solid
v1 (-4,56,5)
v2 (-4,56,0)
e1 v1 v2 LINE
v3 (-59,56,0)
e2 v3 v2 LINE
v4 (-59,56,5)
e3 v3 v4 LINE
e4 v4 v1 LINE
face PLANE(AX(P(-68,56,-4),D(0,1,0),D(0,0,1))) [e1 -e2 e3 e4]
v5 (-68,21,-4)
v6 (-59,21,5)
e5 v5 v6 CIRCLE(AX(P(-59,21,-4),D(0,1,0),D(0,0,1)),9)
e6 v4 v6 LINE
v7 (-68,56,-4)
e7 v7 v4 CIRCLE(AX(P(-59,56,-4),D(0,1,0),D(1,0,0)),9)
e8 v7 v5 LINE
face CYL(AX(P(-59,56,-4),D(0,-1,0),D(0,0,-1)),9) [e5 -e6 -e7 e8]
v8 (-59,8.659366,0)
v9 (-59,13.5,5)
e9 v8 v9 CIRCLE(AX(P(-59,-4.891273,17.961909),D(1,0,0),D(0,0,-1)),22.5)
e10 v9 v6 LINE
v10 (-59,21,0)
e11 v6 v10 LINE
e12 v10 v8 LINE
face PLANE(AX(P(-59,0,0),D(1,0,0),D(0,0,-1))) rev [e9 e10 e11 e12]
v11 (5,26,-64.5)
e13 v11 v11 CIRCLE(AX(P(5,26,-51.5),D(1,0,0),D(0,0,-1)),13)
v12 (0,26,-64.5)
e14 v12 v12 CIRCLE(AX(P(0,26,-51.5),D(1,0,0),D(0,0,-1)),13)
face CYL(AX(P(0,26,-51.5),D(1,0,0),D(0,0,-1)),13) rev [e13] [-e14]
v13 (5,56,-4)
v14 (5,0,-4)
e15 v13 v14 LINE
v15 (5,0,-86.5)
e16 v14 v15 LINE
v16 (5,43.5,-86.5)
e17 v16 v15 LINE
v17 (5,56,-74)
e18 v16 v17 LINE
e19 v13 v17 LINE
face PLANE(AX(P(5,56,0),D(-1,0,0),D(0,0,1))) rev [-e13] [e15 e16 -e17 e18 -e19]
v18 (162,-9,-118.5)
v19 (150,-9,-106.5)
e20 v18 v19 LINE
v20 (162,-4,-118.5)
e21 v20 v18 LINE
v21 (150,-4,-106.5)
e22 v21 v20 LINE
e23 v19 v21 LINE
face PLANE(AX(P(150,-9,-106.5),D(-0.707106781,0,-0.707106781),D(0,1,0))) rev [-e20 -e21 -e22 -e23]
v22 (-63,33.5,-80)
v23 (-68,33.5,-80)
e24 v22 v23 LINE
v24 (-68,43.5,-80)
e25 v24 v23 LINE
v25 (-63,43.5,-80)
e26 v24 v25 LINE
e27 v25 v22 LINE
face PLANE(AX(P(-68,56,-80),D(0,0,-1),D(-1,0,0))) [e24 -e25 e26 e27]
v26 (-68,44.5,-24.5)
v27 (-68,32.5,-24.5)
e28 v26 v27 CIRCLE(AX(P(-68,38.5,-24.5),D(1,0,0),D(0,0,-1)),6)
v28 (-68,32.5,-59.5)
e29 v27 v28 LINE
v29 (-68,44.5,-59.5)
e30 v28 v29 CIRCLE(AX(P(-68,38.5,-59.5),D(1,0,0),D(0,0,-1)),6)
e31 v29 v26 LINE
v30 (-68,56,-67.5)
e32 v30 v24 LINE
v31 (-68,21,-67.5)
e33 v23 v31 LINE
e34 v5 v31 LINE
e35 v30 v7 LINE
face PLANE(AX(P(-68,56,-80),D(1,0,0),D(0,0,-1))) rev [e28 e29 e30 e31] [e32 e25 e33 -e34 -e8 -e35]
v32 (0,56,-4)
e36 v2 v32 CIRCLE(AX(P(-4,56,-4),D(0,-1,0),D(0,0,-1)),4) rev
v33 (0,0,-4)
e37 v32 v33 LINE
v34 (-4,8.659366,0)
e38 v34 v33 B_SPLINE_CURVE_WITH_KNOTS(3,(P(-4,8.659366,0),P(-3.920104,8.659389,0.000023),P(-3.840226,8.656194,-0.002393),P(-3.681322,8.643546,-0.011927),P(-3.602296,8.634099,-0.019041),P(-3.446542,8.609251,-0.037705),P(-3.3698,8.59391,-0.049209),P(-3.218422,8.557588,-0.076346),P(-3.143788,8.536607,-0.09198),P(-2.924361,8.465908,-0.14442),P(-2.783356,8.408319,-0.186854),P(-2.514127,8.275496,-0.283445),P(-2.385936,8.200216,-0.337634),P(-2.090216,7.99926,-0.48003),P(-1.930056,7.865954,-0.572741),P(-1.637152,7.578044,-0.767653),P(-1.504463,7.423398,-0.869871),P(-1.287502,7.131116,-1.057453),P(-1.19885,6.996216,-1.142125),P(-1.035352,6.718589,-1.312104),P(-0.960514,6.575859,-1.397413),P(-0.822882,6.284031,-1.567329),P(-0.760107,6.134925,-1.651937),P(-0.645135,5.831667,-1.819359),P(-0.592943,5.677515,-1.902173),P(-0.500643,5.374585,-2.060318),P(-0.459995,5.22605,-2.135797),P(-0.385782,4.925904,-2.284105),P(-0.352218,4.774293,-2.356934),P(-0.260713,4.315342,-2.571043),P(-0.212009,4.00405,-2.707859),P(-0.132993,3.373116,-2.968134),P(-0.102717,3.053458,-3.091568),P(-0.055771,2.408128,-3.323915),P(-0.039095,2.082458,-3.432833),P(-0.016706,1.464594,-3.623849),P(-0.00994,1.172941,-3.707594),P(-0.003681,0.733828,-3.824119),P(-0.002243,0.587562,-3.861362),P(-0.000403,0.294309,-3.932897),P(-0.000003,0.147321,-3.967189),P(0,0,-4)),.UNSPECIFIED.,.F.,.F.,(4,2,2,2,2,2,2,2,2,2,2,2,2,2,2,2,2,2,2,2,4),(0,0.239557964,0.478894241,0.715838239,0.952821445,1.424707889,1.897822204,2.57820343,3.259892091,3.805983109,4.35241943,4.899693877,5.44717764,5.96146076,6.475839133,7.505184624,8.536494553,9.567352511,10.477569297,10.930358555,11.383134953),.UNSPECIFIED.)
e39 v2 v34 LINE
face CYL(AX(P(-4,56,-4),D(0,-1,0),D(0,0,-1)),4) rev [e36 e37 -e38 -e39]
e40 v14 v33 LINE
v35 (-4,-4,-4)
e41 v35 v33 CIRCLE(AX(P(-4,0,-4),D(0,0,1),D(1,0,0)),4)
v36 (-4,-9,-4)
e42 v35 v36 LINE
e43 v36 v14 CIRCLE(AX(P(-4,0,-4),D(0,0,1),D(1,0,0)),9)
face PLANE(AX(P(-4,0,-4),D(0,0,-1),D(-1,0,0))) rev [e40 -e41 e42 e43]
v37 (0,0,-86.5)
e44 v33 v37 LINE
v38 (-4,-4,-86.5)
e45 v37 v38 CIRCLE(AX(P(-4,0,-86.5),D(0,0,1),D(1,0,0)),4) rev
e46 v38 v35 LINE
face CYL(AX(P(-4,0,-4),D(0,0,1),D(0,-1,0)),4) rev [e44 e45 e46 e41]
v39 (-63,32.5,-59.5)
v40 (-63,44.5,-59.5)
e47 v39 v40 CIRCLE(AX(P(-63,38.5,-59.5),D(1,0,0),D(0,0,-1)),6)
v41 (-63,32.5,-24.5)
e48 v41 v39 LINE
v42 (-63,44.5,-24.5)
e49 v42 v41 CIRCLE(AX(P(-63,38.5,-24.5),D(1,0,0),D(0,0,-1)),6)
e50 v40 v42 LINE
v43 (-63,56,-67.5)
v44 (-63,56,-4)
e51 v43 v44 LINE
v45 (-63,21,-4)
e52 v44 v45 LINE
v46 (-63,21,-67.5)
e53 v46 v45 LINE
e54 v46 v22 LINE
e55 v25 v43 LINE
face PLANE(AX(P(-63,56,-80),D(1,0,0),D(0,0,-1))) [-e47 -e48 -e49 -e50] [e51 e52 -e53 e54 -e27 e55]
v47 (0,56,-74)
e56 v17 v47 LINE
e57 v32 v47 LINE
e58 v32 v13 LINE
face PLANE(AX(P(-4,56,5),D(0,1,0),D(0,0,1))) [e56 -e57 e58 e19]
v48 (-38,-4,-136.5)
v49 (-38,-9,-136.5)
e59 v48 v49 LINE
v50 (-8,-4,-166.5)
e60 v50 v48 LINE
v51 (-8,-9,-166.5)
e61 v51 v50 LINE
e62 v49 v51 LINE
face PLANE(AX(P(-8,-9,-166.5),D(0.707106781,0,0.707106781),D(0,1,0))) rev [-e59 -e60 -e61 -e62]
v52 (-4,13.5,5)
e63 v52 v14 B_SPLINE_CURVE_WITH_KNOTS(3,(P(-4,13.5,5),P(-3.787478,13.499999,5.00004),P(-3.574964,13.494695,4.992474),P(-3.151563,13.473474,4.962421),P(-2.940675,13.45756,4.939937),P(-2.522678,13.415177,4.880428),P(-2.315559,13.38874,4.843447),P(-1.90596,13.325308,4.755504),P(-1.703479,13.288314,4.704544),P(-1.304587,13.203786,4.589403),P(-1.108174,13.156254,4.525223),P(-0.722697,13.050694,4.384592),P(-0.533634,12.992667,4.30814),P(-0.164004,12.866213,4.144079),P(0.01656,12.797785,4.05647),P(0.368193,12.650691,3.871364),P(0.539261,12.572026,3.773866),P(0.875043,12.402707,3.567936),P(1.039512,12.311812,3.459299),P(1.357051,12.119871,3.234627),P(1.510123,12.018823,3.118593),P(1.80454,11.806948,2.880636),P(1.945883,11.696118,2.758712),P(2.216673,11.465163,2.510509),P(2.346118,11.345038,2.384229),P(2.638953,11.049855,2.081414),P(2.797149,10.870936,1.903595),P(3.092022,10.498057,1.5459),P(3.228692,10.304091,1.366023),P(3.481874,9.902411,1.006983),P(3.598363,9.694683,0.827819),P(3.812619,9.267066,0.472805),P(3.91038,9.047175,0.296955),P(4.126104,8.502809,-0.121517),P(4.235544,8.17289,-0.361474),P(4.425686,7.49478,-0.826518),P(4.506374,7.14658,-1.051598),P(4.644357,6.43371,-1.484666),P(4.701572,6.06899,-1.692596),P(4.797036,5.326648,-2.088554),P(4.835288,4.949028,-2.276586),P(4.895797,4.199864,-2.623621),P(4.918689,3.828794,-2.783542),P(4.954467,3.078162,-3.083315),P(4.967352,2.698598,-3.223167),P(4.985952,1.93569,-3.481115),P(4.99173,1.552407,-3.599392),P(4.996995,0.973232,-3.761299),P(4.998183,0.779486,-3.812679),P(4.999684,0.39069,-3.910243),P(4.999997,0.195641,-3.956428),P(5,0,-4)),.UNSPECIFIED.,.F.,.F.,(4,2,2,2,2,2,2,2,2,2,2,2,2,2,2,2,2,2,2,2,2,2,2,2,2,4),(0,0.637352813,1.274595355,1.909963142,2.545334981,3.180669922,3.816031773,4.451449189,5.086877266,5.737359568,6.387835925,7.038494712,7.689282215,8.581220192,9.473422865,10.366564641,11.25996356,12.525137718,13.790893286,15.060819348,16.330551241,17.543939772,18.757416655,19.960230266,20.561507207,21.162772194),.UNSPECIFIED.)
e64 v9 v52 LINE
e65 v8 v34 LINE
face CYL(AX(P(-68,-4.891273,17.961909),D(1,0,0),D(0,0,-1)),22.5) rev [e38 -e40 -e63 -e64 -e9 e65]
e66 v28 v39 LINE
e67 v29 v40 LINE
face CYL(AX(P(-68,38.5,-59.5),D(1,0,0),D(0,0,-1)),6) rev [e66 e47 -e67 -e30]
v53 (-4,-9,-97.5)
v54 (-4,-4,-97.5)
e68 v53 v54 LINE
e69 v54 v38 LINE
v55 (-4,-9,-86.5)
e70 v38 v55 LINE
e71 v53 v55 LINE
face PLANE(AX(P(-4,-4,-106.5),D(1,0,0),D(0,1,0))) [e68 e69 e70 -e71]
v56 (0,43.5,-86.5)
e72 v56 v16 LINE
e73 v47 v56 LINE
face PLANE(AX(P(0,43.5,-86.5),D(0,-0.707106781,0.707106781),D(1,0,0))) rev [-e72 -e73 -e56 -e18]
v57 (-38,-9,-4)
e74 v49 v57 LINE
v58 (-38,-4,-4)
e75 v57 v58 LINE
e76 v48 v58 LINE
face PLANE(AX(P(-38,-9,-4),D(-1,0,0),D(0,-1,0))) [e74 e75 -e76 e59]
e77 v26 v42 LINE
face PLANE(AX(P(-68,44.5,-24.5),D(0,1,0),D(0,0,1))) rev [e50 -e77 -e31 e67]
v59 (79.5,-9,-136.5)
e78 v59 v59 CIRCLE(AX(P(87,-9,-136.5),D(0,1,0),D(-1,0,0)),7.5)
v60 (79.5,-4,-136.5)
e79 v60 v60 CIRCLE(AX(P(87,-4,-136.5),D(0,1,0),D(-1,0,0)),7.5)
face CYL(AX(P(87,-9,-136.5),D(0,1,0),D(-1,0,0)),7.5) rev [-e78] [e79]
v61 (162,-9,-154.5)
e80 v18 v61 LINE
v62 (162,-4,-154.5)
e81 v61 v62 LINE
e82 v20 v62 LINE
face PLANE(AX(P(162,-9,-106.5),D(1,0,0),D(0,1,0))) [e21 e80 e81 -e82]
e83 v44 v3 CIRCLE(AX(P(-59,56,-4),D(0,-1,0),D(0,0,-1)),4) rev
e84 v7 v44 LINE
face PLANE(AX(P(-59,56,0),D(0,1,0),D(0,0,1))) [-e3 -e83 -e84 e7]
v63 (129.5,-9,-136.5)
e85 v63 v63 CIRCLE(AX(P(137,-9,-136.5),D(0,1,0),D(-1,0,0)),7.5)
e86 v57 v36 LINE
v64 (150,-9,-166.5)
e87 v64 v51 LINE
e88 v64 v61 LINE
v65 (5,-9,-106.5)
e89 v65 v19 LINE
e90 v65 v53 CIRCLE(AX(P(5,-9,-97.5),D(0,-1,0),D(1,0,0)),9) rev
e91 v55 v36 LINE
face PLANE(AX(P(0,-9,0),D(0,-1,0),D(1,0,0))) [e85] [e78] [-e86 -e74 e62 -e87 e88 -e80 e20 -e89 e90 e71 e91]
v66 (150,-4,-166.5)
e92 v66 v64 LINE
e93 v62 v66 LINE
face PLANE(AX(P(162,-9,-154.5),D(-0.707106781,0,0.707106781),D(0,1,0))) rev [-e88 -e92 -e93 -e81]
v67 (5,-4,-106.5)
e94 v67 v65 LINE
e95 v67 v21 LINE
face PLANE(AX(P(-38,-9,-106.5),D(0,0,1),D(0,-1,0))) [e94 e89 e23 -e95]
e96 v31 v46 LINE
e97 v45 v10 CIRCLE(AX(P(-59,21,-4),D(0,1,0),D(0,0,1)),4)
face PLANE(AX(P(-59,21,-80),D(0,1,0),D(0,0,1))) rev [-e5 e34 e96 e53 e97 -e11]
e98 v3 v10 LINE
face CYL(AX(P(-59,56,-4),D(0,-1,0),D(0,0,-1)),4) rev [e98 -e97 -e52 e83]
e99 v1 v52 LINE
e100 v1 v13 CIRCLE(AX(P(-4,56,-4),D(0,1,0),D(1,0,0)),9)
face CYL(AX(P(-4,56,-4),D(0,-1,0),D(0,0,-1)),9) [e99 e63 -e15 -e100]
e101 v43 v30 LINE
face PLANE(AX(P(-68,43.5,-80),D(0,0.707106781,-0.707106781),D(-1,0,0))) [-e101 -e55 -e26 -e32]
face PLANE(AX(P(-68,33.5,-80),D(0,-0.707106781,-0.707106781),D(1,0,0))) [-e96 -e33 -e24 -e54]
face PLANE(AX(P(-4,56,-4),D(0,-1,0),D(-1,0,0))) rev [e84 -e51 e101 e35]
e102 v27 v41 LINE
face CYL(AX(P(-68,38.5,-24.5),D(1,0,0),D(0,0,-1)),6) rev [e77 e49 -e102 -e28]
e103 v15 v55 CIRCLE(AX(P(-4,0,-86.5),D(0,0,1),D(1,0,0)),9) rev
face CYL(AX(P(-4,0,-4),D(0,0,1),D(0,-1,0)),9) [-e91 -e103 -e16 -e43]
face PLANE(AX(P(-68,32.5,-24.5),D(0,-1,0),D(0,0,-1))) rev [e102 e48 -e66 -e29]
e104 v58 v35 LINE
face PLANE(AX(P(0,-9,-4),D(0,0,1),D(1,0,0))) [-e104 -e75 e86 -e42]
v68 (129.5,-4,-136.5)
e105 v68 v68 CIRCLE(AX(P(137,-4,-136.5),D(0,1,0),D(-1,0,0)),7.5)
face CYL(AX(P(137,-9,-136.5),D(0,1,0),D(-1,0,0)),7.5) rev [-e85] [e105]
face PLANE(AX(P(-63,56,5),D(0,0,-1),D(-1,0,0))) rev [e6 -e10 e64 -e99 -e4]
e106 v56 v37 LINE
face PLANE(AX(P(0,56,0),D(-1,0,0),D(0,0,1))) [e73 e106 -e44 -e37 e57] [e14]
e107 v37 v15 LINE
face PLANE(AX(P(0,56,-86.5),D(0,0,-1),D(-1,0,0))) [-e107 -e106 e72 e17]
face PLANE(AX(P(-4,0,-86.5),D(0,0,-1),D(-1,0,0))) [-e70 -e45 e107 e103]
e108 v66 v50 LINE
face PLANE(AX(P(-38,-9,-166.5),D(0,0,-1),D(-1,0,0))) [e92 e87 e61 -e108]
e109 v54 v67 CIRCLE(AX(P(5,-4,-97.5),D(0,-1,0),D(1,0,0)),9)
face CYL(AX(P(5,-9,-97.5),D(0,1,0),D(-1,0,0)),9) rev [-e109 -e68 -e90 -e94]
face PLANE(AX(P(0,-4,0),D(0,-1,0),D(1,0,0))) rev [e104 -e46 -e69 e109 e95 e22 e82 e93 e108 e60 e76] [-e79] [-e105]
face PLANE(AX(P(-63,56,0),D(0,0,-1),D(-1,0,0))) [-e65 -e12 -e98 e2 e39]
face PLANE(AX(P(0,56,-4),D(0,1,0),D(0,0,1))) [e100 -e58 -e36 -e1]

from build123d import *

# Parameters (mm, degrees)
BASE_FLANGE1_DEPTH      = 56
SKETCH9_W               = 85
SKETCH9_H               = 21
CUT_EXTRUDE2_DEPTH      = 9
CUT_EXTRUDE3_DEPTH      = 10
SKETCH11_R              = 13
CUT_EXTRUDE4_DEPTH      = 10
BREAK_CORNER1_START     = -68
BREAK_CORNER1_DEPTH     = 5
BREAK_CORNER1_2_DEPTH   = 5
EDGE_FLANGE1_DEPTH      = 82.5
EDGE_FLANGE1_START      = -5
EDGE_FLANGE1_PROFILE_W  = 102.5
EDGE_FLANGE1_PROFILE_H  = 34
EDGE_FLANGE1_FLAT_DEPTH = 5
SKETCH15_W              = 200
SKETCH15_H              = 60
SKETCH15_R              = 7.5
BOSS_EXTRUDE1_DEPTH     = 5
BREAK_CORNER2_START     = -144.603336753
BREAK_CORNER2_OUTLINE_W = 46
BREAK_CORNER2_OUTLINE_H = 8
BREAK_CORNER2_DEPTH     = 21.213203436
BREAK_CORNER3_START     = -9
BREAK_CORNER3_DEPTH     = 5
CUT_EXTRUDE5_DEPTH      = 236.599766553
FILLET1_R               = 9


# Read off the part's stored shape, not the designer's step: Break-Corner1, Break-Corner2, Break-Corner3
# Sheet-metal steps are written as plain solids
with BuildPart() as part:
    # Sketch1 → Base-Flange1 (new body)
    with BuildSketch(Plane(origin=(0, 0, 0), x_dir=(1, 0, 0), z_dir=(0, 1, 0))):
        with BuildLine():
            Line((-63, 80), (-63, 4))
            ThreePointArc((-63, 4), (-61.828427125, 1.171572875), (-59, 0))
            Line((-59, 0), (-4, 0))
            ThreePointArc((-4, 0), (-1.171572875, 1.171572875), (0, 4))
            Line((0, 4), (0, 86.5))
            Line((0, 86.5), (5, 86.5))
            Line((5, 86.5), (5, 4))
            ThreePointArc((5, 4), (2.363961031, -2.363961031), (-4, -5))
            Line((-4, -5), (-59, -5))
            ThreePointArc((-59, -5), (-65.363961031, -2.363961031), (-68, 4))
            Line((-68, 4), (-68, 80))
            Line((-68, 80), (-63, 80))
        make_face()
    extrude(amount=BASE_FLANGE1_DEPTH)

    # Sketch9 → Cut-Extrude2 (cut)
    with BuildSketch(Plane.ZY.offset(68)):
        with Locations((-37.5, 10.5)):
            Rectangle(SKETCH9_W, SKETCH9_H)
    extrude(amount=-CUT_EXTRUDE2_DEPTH, mode=Mode.SUBTRACT)

    # Sketch10 → Cut-Extrude3 (cut)
    with BuildSketch(Plane(origin=(-63, 0, 0), x_dir=(0, 0, -1), z_dir=(1, 0, 0))):
        with BuildLine():
            Line((24.5, 44.5), (59.5, 44.5))
            ThreePointArc((59.5, 44.5), (65.5, 38.5), (59.5, 32.5))
            Line((59.5, 32.5), (24.5, 32.5))
            ThreePointArc((24.5, 32.5), (18.5, 38.5), (24.5, 44.5))
        make_face()
    extrude(amount=-CUT_EXTRUDE3_DEPTH, mode=Mode.SUBTRACT)

    # Sketch11 → Cut-Extrude4 (cut)
    with BuildSketch(Plane(origin=(5, 0, 0), x_dir=(0, 0, -1), z_dir=(1, 0, 0))):
        with Locations((51.5, 26)):
            Circle(SKETCH11_R)
    extrude(amount=-CUT_EXTRUDE4_DEPTH, mode=Mode.SUBTRACT)

    # Break-Corner1 outline → Break-Corner1 (cut)
    with BuildSketch(Plane.YZ.offset(BREAK_CORNER1_START)):
        Polygon((21, -80), (33.5, -80), (21, -67.5), align=None)
        Polygon((56, -67.5), (43.5, -80), (56, -80), align=None)
    extrude(amount=BREAK_CORNER1_DEPTH, mode=Mode.SUBTRACT)

    # Break-Corner1 2 outline → Break-Corner1 2 (cut)
    with BuildSketch(Plane.YZ):
        Polygon((56, -86.5), (56, -74), (43.5, -86.5), align=None)
    extrude(amount=BREAK_CORNER1_2_DEPTH, mode=Mode.SUBTRACT)

    # Edge-Flange1 bend section (across the edge) → Edge-Flange1 (add)
    with BuildSketch(Plane(origin=(0, -4, -86.5), x_dir=(0, 1, 0), z_dir=(0, 0, 1))):
        with BuildLine():
            Line((-5, 4), (0, 4))
            ThreePointArc((0, 4), (1.171572875, 1.171572875), (4, 0))
            Line((4, 0), (4, -5))
            ThreePointArc((4, -5), (-2.363961031, -2.363961031), (-5, 4))
        make_face()
    extrude(amount=EDGE_FLANGE1_DEPTH)

    # Edge-Flange1 profile (on flange) → Edge-Flange1 flat (add)
    with BuildSketch(Plane(origin=(0, -4, 0), x_dir=(0, 0, -1), z_dir=(0, 1, 0)).offset(EDGE_FLANGE1_START)):
        with Locations((55.25, 21)):
            Rectangle(EDGE_FLANGE1_PROFILE_W, EDGE_FLANGE1_PROFILE_H)
    extrude(amount=EDGE_FLANGE1_FLAT_DEPTH)

    # Sketch15 → Boss-Extrude1 (add)
    with BuildSketch(Plane(origin=(0, -4, 0), x_dir=(1, 0, 0), z_dir=(0, 1, 0))):
        with Locations((62, 136.5)):
            Rectangle(SKETCH15_W, SKETCH15_H)
        with Locations(Location((87, 136.5, 0), (0, 0, 180))):
            Circle(SKETCH15_R, mode=Mode.SUBTRACT)
        with Locations(Location((137, 136.5, 0), (0, 0, 180))):
            Circle(SKETCH15_R, mode=Mode.SUBTRACT)
    extrude(amount=-BOSS_EXTRUDE1_DEPTH)

    # Break-Corner2 outline → Break-Corner2 (cut)
    with BuildSketch(Plane(origin=(0, 0, 0), x_dir=(0.7071067811865471, 0, -0.707106781186548), z_dir=(0.707106781186548, 0, 0.707106781186547)).offset(BREAK_CORNER2_START)):
        with Locations((91, -7)):
            Rectangle(BREAK_CORNER2_OUTLINE_W, BREAK_CORNER2_OUTLINE_H)
    extrude(amount=BREAK_CORNER2_DEPTH, mode=Mode.SUBTRACT)

    # Break-Corner3 outline → Break-Corner3 (cut)
    with BuildSketch(Plane(origin=(0, 0, 0), x_dir=(1, 0, 0), z_dir=(0, 1, 0)).offset(BREAK_CORNER3_START)):
        Polygon((162, 106.5), (162, 118.5), (150, 106.5), align=None)
        Polygon((150, 166.5), (162, 154.5), (162, 166.5), align=None)
    extrude(amount=BREAK_CORNER3_DEPTH, mode=Mode.SUBTRACT)

    # Sketch16 → Cut-Extrude5 (cut, through all)
    with BuildSketch(Plane(origin=(5, 0, 0), x_dir=(0, 0, -1), z_dir=(1, 0, 0))):
        with BuildLine():
            Line((-5, 13.5), (-5, 0))
            Line((-5, 0), (4, 0))
            ThreePointArc((4, 0), (0.759222528, 7.589481685), (-5, 13.5))
        make_face()
    extrude(amount=-CUT_EXTRUDE5_DEPTH, mode=Mode.SUBTRACT)

    # Fillet1
    fillet1_edges = [part.edges().sort_by_distance(p)[0] for p in [
        (-4, -6.5, -106.5),
    ]]
    fillet(fillet1_edges, radius=FILLET1_R)


solid = part.part
